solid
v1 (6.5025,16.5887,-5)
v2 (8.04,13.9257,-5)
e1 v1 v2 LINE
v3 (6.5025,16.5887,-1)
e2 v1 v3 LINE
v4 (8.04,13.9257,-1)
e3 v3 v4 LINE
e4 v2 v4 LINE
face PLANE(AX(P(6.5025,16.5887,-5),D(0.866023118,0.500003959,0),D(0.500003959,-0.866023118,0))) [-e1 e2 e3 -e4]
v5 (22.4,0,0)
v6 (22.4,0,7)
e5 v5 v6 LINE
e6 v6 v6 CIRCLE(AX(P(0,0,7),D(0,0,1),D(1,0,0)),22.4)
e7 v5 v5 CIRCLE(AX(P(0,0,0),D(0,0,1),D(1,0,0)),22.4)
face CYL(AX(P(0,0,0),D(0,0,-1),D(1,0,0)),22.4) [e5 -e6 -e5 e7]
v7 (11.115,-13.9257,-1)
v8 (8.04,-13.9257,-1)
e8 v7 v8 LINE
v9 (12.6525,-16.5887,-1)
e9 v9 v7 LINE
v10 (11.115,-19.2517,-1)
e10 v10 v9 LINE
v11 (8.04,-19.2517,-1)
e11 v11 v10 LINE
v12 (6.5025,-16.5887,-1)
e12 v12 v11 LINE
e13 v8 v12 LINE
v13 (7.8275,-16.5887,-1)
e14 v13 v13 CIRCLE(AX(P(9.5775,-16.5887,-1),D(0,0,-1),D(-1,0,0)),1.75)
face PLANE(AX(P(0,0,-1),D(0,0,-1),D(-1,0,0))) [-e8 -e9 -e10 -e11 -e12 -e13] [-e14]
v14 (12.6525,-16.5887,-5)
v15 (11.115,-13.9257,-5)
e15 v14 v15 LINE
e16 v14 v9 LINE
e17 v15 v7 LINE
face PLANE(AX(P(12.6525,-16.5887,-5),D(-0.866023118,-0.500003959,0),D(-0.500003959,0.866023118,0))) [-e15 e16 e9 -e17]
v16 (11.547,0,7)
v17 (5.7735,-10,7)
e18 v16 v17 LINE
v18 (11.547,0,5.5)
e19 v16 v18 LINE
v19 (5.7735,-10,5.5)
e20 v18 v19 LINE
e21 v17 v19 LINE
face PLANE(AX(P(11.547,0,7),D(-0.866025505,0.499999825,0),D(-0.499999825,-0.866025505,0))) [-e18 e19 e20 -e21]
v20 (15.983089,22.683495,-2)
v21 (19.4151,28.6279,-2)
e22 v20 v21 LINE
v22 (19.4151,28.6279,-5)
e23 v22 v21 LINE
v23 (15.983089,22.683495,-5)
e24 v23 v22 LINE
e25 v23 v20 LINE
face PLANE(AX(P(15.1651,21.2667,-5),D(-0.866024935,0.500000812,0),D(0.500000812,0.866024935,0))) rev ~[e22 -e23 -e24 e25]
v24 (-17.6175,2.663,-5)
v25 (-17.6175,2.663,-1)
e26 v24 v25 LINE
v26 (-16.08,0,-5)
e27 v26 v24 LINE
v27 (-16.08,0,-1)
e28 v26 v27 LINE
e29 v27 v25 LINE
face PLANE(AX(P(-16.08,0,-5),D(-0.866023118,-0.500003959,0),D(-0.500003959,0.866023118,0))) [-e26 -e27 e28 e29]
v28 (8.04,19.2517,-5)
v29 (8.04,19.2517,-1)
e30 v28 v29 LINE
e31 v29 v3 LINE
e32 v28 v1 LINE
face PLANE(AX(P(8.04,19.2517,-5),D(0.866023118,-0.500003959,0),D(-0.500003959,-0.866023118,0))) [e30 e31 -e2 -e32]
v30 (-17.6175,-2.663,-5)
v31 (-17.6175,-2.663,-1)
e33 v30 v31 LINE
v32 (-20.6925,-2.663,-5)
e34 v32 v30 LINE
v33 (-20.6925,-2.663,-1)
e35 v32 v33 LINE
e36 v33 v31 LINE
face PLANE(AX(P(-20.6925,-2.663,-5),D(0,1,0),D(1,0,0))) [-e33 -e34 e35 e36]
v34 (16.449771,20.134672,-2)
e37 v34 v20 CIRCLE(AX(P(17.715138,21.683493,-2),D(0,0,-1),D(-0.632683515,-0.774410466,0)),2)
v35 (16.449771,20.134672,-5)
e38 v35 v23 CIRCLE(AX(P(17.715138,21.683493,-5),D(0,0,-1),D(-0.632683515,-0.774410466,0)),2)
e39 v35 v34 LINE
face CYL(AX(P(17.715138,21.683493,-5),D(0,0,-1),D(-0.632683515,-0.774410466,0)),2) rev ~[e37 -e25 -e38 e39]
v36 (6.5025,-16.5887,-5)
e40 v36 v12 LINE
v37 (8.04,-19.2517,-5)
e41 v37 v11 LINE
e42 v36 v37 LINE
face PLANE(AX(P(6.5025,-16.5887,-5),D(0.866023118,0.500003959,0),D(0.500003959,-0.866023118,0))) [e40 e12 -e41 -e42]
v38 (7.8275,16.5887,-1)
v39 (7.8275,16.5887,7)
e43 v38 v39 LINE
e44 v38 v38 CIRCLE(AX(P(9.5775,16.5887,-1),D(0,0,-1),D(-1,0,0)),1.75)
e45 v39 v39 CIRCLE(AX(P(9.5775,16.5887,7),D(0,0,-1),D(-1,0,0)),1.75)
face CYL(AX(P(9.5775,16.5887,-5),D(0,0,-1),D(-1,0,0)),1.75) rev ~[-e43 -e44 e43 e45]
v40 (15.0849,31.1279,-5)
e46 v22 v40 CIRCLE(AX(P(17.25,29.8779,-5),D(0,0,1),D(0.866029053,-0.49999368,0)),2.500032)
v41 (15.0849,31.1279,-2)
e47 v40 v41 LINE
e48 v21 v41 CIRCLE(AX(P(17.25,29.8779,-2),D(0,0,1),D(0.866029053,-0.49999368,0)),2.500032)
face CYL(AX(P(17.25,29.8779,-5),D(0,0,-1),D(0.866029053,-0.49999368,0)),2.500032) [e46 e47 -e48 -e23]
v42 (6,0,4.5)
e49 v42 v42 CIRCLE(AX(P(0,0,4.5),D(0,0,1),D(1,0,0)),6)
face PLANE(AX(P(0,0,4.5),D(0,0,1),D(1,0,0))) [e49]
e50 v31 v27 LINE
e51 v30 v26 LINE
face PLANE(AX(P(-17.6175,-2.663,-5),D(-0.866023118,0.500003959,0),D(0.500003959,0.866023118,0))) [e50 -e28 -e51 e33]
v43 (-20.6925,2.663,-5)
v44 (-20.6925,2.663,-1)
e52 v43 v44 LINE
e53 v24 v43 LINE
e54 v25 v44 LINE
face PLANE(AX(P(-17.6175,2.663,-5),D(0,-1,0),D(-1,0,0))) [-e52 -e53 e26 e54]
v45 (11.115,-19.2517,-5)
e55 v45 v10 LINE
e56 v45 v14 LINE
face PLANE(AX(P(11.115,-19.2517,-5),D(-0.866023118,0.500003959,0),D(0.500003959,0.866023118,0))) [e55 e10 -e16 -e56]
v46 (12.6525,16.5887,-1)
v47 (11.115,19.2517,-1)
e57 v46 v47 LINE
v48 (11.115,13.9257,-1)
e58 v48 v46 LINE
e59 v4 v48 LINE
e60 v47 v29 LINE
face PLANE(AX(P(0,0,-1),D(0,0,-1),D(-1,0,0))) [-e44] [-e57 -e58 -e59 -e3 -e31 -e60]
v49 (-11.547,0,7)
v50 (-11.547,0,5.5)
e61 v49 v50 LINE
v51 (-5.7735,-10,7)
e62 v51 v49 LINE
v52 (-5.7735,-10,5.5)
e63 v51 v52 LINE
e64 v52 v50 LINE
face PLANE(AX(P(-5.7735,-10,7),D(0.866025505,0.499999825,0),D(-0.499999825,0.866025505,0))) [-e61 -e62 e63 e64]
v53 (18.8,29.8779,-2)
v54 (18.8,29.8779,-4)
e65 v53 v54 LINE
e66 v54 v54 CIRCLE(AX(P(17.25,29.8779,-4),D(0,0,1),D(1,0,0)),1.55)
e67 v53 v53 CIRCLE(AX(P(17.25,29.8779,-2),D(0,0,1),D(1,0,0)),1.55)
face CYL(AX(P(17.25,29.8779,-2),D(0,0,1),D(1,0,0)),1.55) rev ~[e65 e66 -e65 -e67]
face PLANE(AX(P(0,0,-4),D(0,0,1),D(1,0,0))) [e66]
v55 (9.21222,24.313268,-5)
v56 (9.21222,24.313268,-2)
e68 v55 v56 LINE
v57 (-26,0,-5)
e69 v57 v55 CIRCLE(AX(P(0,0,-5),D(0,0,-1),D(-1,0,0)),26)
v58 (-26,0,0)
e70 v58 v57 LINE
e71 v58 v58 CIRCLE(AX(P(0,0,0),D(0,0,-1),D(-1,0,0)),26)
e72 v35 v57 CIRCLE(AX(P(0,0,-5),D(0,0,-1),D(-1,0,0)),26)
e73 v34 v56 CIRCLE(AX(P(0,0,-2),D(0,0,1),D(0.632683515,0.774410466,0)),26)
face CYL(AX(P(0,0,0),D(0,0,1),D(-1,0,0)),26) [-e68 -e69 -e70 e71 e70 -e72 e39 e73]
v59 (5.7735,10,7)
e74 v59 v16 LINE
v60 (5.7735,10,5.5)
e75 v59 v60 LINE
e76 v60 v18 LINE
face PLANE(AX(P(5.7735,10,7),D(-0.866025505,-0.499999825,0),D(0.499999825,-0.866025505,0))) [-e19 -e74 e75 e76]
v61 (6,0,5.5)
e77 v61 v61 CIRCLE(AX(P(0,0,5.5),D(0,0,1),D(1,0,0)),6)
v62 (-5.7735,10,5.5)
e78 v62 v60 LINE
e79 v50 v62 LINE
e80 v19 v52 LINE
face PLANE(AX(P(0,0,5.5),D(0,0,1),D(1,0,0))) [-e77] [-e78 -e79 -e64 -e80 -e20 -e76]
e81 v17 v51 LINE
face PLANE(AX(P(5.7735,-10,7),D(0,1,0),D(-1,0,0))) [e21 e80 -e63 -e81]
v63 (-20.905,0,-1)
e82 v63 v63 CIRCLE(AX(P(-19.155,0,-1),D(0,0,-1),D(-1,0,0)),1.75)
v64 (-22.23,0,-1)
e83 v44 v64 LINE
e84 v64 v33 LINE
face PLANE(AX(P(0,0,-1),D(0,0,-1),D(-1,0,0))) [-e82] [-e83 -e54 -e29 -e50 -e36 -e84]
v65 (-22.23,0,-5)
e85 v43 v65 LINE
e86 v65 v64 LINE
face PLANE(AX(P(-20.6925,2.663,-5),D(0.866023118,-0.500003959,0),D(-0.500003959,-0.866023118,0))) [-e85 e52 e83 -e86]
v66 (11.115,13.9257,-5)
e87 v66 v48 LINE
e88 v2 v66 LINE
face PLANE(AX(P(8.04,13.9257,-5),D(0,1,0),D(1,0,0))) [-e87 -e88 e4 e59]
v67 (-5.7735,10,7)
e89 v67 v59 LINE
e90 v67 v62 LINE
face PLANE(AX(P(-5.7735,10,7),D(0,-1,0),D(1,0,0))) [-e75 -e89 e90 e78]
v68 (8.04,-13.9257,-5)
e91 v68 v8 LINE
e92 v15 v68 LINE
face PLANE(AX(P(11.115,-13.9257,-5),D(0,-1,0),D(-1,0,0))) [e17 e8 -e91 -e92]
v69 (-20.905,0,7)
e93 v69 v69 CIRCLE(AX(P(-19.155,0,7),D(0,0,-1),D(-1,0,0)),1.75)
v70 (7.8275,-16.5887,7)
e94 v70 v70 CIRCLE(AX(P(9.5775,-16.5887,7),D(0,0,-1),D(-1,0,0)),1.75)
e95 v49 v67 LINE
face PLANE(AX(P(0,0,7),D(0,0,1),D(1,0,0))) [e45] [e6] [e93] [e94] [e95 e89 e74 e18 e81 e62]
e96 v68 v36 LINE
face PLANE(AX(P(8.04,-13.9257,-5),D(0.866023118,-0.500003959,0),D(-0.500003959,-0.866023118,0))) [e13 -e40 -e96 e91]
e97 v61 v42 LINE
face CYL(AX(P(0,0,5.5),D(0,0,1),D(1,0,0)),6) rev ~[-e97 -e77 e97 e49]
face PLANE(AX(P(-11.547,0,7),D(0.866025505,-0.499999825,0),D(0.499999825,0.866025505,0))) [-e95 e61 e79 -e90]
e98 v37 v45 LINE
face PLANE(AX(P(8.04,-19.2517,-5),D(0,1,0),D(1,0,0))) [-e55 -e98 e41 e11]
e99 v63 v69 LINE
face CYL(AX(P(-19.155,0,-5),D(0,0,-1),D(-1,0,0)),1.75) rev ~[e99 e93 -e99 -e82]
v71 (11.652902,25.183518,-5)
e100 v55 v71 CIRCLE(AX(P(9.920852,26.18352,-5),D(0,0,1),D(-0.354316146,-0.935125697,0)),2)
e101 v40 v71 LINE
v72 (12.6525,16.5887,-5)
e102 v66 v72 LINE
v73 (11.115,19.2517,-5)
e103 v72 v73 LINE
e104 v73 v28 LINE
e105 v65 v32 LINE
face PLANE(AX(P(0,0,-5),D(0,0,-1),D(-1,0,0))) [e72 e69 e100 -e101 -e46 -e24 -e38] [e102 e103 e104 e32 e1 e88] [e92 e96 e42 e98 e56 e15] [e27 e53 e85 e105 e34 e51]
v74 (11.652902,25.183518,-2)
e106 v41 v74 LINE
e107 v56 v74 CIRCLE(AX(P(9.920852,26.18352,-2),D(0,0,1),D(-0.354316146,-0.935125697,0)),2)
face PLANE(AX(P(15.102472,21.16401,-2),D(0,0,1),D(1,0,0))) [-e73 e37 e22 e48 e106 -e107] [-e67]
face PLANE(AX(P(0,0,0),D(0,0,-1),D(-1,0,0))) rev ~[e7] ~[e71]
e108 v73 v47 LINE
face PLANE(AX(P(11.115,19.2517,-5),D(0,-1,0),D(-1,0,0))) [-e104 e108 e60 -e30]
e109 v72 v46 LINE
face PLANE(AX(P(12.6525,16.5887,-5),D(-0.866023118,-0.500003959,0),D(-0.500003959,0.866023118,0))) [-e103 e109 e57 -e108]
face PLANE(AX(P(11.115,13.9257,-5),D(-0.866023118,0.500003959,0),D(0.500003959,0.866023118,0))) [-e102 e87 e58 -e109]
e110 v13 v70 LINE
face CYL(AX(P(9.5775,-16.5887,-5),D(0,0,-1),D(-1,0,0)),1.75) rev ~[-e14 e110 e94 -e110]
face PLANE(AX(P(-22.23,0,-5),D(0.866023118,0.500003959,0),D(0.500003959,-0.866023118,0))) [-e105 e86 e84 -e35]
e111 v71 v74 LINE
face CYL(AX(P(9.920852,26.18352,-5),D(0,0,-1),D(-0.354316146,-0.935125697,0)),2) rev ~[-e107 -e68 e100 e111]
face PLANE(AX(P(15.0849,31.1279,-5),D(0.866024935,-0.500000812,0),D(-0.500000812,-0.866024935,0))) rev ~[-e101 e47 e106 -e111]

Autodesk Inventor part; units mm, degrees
ref_plane "YZ Plane" through (0, 0, 0) normal (1, 0, 0) x (0, 1, 0)
ref_plane "XZ Plane" through (0, 0, 0) normal (0, 1, 0) x (-1, 0, 0)
sketch "Sketch1" plane through (0, 0, 0) normal (0, 0, 1) x (1, 0, 0)
  circle A0 centre (0, 0) radius 22.4
  dimension "d0" = 44.8
extrude "Extrusion1" add sketch "Sketch1" along normal blind 7
sketch "Sketch2" plane through (0, 0, 0) normal (0, 0, -1) x (-1, 0, 0)
  circle A0 centre (0, 0) radius 26
  dimension "d3" = 52
extrude "Extrusion2" add sketch "Sketch2" along normal blind 5
sketch "Sketch3" plane through (0, 0, -5) normal (0, 0, -1) x (-1, 0, 0)
  line L0 (22.23, 0) -> (20.6925, -2.663)
  line L1 (20.6925, -2.663) -> (17.6175, -2.663)
  line L2 (17.6175, -2.663) -> (16.08, 0)
  line L3 (16.08, 0) -> (17.6175, 2.663)
  line L4 (17.6175, 2.663) -> (20.6925, 2.663)
  line L5 (20.6925, 2.663) -> (22.23, 0)
  line L6 (-11.115, 19.2517) -> (-8.04, 19.2517)
  line L7 (-8.04, 19.2517) -> (-6.5025, 16.5887)
  line L8 (-6.5025, 16.5887) -> (-8.04, 13.9257)
  line L9 (-8.04, 13.9257) -> (-11.115, 13.9257)
  line L10 (-11.115, 13.9257) -> (-12.6525, 16.5887)
  line L11 (-12.6525, 16.5887) -> (-11.115, 19.2517)
  line L12 (-11.115, -19.2517) -> (-12.6525, -16.5887)
  line L13 (-12.6525, -16.5887) -> (-11.115, -13.9257)
  line L14 (-11.115, -13.9257) -> (-8.04, -13.9257)
  line L15 (-8.04, -13.9257) -> (-6.5025, -16.5887)
  line L16 (-6.5025, -16.5887) -> (-8.04, -19.2517)
  line L17 (-8.04, -19.2517) -> (-11.115, -19.2517)
  point P0 (0, 0)
  point P1 (19.155, 0)
  point P2 (-9.5775, 16.5887)
  point P3 (-9.5775, -16.5887)
  dimension "d6" = 3.075
  dimension "d7" = 19.155
  dimension "d10" = 360
extrude "Extrusion3" cut sketch "Sketch3" against normal blind 4
sketch "Sketch4" plane through (0, 0, -5) normal (0, 0, -1) x (-1, 0, 0)
  circle A0 centre (19.155, 0) radius 1.75
  circle A1 centre (-9.5775, 16.5887) radius 1.75
  circle A2 centre (-9.5775, -16.5887) radius 1.75
  point P0 (0, 0)
  dimension "d14" = 3.5
  dimension "d15" = 19.155
  dimension "d18" = 360
extrude "Extrusion4" cut sketch "Sketch4" against normal through all
sketch "Sketch5" plane through (0, 0, 7) normal (0, 0, 1) x (1, 0, 0)
  line L0 (-11.547, 0) -> (-5.7735, 10)
  line L1 (-5.7735, 10) -> (5.7735, 10)
  line L2 (5.7735, 10) -> (11.547, 0)
  line L3 (11.547, 0) -> (5.7735, -10)
  line L4 (5.7735, -10) -> (-5.7735, -10)
  line L5 (-5.7735, -10) -> (-11.547, 0)
  point P0 (0, 0)
  point P1 (0, 0)
  dimension "d22" = 10
extrude "Extrusion5" cut sketch "Sketch5" against normal blind 1.5
ref_plane "Work Plane1" through (0, 0, 6.5) normal (0, 0, 1) x (1, 0, 0)
sketch "Sketch6" plane through (0, 0, 6.5) normal (0, 0, 1) x (1, 0, 0)
  circle A0 centre (0, 0) radius 22.5
  circle A1 centre (0, 0) radius 22.4 projected
  circle A2 centre (0, 0) radius 21.1
  dimension "d26" = 45
  dimension "d27" = 42.2
extrude "Extrusion6" [suppressed]
sketch "Sketch7" plane through (0, 0, -5) normal (0, 0, -1) x (-1, 0, 0)
  point P0 (0, 0)
sketch "Sketch8" plane through (0, 0, -5) normal (0, 0, 1) x (1, 0, 0)
  line L0 (0, 0) -> (17.25, 29.8779)
  line L1 (0, 0) -> (34.5, 0) construction
  circle A0 centre (0, 0) radius 26 projected
  line L2 (13, 22.5167) -> (17.25, 29.8779) construction
  line L3 (15.1651, 21.2667) -> (19.4151, 28.6279)
  line L4 (15.0849, 31.1279) -> (10.8349, 23.7667)
  arc A1 (10.8349, 23.7667) -> (15.1651, 21.2667) centre (13, 22.5167) ccw
  arc A2 (19.4151, 28.6279) -> (15.0849, 31.1279) centre (17.25, 29.8779) ccw
  point P0 (15.125, 26.1973)
  point P1 (10.7773, 23.6611)
  point P2 (15.1025, 21.164)
  dimension "d30" = 34.5
  dimension "d31" = 60
  dimension "d32" = 5
extrude "Extrusion7" add sketch "Sketch8" along normal blind 3 contours A0 A1 L4 A2 L3
sketch "Sketch9" plane through (0, 0, -2) normal (0, 0, 1) x (1, 0, 0)
  arc A0 (19.4151, 28.6279) -> (15.0849, 31.1279) centre (17.25, 29.8779) ccw projected
  circle A1 centre (17.25, 29.8779) radius 1.55
  point P0 (0, 0)
  dimension "d35" = 3.1
extrude "Extrusion8" cut sketch "Sketch9" against normal blind 2
fillet "Fillet1" radius 2 2 edges at (15.1025, 21.164, -3.5) (10.7773, 23.6611, -3.5)
sketch "Sketch10" plane through (0, 0, 5.5) normal (0, 0, 1) x (1, 0, 0)
  circle A0 centre (0, 0) radius 6
  dimension "d39" = 12
extrude "Extrusion9" cut sketch "Sketch10" against normal blind 1
properties part number "Planet_Carrier_Top"
